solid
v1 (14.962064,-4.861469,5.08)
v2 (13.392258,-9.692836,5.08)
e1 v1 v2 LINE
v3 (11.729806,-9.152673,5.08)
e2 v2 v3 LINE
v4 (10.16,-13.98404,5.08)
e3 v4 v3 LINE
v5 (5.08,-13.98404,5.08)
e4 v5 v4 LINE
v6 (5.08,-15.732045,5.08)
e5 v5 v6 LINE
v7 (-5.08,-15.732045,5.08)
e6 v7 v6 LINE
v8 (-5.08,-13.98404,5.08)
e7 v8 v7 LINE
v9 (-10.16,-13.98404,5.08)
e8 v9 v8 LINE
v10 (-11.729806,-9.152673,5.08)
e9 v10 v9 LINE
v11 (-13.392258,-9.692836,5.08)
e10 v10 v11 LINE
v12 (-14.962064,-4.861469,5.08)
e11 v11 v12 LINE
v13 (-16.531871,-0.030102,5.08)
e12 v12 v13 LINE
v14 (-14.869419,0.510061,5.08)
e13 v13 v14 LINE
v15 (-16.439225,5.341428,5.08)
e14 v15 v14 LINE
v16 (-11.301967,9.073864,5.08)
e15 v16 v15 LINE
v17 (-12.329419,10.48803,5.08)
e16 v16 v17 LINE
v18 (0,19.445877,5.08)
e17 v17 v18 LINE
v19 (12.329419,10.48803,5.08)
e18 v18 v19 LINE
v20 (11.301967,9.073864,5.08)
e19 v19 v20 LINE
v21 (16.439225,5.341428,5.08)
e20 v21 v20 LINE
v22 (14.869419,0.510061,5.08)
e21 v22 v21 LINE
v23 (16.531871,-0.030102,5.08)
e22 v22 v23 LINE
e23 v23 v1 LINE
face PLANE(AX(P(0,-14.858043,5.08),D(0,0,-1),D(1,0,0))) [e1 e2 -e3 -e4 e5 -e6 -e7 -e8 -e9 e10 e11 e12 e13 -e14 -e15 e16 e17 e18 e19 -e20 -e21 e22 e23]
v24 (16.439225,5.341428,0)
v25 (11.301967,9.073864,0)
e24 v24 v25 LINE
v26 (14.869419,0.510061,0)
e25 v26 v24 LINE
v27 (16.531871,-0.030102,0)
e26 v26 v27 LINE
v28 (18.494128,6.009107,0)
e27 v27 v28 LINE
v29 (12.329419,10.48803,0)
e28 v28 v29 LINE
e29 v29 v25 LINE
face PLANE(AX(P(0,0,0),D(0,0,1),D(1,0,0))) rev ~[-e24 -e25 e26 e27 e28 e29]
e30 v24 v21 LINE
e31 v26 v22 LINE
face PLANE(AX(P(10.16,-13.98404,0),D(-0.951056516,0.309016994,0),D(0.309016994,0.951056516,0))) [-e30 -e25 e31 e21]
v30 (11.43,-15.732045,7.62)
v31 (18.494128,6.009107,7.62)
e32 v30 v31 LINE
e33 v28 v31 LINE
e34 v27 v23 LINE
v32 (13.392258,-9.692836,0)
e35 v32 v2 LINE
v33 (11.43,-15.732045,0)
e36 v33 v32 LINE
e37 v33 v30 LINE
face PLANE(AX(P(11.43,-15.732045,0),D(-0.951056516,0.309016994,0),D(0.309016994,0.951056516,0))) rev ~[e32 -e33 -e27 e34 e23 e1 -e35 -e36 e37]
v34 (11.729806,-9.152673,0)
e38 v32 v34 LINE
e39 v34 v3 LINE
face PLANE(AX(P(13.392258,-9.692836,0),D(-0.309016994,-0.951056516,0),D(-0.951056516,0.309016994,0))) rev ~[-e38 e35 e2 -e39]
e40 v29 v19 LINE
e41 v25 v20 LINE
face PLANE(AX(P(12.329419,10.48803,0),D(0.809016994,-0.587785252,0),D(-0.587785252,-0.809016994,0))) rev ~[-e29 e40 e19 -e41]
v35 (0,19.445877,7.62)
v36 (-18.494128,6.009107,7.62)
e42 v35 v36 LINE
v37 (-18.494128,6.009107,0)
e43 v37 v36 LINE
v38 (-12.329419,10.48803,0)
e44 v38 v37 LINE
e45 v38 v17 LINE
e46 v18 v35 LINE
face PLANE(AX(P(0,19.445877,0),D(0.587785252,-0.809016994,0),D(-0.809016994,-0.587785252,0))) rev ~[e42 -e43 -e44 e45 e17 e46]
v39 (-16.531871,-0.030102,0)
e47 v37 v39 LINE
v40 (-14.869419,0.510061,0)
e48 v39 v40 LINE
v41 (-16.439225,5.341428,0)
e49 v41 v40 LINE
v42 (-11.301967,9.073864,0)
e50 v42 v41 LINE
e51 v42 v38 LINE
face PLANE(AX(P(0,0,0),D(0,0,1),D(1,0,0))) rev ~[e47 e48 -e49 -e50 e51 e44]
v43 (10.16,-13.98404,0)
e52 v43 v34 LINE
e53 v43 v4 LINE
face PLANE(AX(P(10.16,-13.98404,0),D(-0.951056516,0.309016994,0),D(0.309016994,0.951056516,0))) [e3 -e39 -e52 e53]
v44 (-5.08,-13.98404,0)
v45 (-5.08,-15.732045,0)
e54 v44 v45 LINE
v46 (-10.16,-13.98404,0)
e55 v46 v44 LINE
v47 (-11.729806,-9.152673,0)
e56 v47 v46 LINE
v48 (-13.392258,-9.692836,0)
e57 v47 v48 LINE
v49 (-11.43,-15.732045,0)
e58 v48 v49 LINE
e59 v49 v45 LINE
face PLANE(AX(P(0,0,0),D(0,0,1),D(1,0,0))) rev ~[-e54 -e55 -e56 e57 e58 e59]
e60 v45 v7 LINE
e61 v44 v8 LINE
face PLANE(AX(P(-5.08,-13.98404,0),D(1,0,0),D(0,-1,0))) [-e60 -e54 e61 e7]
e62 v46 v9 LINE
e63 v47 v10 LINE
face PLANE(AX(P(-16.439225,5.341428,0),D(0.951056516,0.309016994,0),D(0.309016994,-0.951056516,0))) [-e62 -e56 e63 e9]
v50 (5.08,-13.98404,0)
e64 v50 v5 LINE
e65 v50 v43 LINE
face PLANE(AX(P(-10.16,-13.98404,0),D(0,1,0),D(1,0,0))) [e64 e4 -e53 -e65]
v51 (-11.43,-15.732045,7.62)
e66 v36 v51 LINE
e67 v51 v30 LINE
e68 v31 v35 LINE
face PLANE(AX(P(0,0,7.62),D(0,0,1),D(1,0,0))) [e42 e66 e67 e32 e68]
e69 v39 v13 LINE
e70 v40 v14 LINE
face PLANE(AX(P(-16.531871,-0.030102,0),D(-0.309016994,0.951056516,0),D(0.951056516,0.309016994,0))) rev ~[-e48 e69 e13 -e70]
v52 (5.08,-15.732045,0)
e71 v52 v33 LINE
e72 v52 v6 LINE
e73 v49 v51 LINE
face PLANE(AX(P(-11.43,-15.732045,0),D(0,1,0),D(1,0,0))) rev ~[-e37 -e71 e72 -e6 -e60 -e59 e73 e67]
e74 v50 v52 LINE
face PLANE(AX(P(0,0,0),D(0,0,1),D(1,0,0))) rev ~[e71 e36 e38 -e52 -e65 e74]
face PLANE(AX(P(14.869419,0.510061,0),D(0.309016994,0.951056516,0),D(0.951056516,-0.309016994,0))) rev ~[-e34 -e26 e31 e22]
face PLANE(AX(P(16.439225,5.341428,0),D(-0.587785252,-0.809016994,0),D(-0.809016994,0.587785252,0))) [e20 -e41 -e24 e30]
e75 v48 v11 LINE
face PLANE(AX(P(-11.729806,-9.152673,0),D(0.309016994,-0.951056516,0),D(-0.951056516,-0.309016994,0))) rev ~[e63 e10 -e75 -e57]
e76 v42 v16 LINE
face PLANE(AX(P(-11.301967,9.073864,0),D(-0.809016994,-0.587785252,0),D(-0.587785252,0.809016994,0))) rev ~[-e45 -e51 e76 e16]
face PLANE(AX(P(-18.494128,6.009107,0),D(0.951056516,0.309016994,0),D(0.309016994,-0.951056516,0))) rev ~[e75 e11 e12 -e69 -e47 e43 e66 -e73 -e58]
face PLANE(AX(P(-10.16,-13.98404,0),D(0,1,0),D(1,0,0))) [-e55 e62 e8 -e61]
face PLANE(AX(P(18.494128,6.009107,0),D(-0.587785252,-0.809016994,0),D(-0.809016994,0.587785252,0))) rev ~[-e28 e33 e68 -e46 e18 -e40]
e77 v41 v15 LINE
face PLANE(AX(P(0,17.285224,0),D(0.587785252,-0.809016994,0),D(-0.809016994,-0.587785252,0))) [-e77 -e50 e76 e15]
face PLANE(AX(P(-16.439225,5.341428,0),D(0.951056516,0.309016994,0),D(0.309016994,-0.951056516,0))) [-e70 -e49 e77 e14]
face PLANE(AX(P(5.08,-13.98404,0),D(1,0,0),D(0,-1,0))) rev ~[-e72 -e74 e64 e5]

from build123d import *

# Parameters (mm, degrees)
F1_DEPTH = 7.62
F3_DEPTH = 5.08
F4_W     = 10.16
F4_H     = 1.748005039
F5_DEPTH = 5.08


# Not quite as in the source:
# - a feature names something its author has since deleted; it is built from what else it names


with BuildPart() as f1:
    # F0 (on Top) → F1 (new body)
    with BuildSketch(Plane.XY):
        Polygon((-11.43, -15.732045351), (11.43, -15.732045351), (18.4941284914, 6.0091066115), (0, 19.4458774789), (-18.4941284914, 6.0091066115), align=None)
    extrude(amount=F1_DEPTH)

    # F2 (on Top) → F3 (cut)
    with BuildSketch(Plane.XY):
        Polygon((10.16, -13.984040312), (16.4392253257, 5.3414280991), (0, 17.2852244257), (-16.4392253257, 5.3414280991), (-10.16, -13.984040312), align=None)
    extrude(amount=F3_DEPTH, mode=Mode.SUBTRACT)

    # F4 (on face) → F5 (cut)
    with BuildSketch(Plane(origin=(0, 0, 0), x_dir=(1, 0, 0), z_dir=(0, 0, -1))):
        Polygon((-14.8694189943, -0.5100609964), (-13.2996126628, 4.3213061064), (-14.9620642457, 4.8614693697), (-16.5318705771, 0.030102267), align=None)
        Polygon((-14.9620642457, 4.8614693697), (-13.2996126628, 4.3213061064), (-11.7298063314, 9.1526732092), (-13.3922579143, 9.6928364725), align=None)
        Polygon((11.7298063314, 9.1526732092), (13.2996126628, 4.3213061064), (14.9620642457, 4.8614693697), (13.3922579143, 9.6928364725), align=None)
        Polygon((14.9620642457, 4.8614693697), (13.2996126628, 4.3213061064), (14.8694189943, -0.5100609964), (16.5318705771, 0.030102267), align=None)
        with Locations((0, 14.8580428315)):
            Rectangle(F4_W, F4_H)
        Polygon((0, -19.4458774789), (0, -17.2852244257), (-11.3019674114, -9.0738644512), (-12.3294189943, -10.488030234), align=None)
        Polygon((11.3019674114, -9.0738644512), (0, -17.2852244257), (0, -19.4458774789), (12.3294189943, -10.488030234), align=None)
    extrude(amount=-F5_DEPTH, mode=Mode.SUBTRACT)


solid = f1.part
